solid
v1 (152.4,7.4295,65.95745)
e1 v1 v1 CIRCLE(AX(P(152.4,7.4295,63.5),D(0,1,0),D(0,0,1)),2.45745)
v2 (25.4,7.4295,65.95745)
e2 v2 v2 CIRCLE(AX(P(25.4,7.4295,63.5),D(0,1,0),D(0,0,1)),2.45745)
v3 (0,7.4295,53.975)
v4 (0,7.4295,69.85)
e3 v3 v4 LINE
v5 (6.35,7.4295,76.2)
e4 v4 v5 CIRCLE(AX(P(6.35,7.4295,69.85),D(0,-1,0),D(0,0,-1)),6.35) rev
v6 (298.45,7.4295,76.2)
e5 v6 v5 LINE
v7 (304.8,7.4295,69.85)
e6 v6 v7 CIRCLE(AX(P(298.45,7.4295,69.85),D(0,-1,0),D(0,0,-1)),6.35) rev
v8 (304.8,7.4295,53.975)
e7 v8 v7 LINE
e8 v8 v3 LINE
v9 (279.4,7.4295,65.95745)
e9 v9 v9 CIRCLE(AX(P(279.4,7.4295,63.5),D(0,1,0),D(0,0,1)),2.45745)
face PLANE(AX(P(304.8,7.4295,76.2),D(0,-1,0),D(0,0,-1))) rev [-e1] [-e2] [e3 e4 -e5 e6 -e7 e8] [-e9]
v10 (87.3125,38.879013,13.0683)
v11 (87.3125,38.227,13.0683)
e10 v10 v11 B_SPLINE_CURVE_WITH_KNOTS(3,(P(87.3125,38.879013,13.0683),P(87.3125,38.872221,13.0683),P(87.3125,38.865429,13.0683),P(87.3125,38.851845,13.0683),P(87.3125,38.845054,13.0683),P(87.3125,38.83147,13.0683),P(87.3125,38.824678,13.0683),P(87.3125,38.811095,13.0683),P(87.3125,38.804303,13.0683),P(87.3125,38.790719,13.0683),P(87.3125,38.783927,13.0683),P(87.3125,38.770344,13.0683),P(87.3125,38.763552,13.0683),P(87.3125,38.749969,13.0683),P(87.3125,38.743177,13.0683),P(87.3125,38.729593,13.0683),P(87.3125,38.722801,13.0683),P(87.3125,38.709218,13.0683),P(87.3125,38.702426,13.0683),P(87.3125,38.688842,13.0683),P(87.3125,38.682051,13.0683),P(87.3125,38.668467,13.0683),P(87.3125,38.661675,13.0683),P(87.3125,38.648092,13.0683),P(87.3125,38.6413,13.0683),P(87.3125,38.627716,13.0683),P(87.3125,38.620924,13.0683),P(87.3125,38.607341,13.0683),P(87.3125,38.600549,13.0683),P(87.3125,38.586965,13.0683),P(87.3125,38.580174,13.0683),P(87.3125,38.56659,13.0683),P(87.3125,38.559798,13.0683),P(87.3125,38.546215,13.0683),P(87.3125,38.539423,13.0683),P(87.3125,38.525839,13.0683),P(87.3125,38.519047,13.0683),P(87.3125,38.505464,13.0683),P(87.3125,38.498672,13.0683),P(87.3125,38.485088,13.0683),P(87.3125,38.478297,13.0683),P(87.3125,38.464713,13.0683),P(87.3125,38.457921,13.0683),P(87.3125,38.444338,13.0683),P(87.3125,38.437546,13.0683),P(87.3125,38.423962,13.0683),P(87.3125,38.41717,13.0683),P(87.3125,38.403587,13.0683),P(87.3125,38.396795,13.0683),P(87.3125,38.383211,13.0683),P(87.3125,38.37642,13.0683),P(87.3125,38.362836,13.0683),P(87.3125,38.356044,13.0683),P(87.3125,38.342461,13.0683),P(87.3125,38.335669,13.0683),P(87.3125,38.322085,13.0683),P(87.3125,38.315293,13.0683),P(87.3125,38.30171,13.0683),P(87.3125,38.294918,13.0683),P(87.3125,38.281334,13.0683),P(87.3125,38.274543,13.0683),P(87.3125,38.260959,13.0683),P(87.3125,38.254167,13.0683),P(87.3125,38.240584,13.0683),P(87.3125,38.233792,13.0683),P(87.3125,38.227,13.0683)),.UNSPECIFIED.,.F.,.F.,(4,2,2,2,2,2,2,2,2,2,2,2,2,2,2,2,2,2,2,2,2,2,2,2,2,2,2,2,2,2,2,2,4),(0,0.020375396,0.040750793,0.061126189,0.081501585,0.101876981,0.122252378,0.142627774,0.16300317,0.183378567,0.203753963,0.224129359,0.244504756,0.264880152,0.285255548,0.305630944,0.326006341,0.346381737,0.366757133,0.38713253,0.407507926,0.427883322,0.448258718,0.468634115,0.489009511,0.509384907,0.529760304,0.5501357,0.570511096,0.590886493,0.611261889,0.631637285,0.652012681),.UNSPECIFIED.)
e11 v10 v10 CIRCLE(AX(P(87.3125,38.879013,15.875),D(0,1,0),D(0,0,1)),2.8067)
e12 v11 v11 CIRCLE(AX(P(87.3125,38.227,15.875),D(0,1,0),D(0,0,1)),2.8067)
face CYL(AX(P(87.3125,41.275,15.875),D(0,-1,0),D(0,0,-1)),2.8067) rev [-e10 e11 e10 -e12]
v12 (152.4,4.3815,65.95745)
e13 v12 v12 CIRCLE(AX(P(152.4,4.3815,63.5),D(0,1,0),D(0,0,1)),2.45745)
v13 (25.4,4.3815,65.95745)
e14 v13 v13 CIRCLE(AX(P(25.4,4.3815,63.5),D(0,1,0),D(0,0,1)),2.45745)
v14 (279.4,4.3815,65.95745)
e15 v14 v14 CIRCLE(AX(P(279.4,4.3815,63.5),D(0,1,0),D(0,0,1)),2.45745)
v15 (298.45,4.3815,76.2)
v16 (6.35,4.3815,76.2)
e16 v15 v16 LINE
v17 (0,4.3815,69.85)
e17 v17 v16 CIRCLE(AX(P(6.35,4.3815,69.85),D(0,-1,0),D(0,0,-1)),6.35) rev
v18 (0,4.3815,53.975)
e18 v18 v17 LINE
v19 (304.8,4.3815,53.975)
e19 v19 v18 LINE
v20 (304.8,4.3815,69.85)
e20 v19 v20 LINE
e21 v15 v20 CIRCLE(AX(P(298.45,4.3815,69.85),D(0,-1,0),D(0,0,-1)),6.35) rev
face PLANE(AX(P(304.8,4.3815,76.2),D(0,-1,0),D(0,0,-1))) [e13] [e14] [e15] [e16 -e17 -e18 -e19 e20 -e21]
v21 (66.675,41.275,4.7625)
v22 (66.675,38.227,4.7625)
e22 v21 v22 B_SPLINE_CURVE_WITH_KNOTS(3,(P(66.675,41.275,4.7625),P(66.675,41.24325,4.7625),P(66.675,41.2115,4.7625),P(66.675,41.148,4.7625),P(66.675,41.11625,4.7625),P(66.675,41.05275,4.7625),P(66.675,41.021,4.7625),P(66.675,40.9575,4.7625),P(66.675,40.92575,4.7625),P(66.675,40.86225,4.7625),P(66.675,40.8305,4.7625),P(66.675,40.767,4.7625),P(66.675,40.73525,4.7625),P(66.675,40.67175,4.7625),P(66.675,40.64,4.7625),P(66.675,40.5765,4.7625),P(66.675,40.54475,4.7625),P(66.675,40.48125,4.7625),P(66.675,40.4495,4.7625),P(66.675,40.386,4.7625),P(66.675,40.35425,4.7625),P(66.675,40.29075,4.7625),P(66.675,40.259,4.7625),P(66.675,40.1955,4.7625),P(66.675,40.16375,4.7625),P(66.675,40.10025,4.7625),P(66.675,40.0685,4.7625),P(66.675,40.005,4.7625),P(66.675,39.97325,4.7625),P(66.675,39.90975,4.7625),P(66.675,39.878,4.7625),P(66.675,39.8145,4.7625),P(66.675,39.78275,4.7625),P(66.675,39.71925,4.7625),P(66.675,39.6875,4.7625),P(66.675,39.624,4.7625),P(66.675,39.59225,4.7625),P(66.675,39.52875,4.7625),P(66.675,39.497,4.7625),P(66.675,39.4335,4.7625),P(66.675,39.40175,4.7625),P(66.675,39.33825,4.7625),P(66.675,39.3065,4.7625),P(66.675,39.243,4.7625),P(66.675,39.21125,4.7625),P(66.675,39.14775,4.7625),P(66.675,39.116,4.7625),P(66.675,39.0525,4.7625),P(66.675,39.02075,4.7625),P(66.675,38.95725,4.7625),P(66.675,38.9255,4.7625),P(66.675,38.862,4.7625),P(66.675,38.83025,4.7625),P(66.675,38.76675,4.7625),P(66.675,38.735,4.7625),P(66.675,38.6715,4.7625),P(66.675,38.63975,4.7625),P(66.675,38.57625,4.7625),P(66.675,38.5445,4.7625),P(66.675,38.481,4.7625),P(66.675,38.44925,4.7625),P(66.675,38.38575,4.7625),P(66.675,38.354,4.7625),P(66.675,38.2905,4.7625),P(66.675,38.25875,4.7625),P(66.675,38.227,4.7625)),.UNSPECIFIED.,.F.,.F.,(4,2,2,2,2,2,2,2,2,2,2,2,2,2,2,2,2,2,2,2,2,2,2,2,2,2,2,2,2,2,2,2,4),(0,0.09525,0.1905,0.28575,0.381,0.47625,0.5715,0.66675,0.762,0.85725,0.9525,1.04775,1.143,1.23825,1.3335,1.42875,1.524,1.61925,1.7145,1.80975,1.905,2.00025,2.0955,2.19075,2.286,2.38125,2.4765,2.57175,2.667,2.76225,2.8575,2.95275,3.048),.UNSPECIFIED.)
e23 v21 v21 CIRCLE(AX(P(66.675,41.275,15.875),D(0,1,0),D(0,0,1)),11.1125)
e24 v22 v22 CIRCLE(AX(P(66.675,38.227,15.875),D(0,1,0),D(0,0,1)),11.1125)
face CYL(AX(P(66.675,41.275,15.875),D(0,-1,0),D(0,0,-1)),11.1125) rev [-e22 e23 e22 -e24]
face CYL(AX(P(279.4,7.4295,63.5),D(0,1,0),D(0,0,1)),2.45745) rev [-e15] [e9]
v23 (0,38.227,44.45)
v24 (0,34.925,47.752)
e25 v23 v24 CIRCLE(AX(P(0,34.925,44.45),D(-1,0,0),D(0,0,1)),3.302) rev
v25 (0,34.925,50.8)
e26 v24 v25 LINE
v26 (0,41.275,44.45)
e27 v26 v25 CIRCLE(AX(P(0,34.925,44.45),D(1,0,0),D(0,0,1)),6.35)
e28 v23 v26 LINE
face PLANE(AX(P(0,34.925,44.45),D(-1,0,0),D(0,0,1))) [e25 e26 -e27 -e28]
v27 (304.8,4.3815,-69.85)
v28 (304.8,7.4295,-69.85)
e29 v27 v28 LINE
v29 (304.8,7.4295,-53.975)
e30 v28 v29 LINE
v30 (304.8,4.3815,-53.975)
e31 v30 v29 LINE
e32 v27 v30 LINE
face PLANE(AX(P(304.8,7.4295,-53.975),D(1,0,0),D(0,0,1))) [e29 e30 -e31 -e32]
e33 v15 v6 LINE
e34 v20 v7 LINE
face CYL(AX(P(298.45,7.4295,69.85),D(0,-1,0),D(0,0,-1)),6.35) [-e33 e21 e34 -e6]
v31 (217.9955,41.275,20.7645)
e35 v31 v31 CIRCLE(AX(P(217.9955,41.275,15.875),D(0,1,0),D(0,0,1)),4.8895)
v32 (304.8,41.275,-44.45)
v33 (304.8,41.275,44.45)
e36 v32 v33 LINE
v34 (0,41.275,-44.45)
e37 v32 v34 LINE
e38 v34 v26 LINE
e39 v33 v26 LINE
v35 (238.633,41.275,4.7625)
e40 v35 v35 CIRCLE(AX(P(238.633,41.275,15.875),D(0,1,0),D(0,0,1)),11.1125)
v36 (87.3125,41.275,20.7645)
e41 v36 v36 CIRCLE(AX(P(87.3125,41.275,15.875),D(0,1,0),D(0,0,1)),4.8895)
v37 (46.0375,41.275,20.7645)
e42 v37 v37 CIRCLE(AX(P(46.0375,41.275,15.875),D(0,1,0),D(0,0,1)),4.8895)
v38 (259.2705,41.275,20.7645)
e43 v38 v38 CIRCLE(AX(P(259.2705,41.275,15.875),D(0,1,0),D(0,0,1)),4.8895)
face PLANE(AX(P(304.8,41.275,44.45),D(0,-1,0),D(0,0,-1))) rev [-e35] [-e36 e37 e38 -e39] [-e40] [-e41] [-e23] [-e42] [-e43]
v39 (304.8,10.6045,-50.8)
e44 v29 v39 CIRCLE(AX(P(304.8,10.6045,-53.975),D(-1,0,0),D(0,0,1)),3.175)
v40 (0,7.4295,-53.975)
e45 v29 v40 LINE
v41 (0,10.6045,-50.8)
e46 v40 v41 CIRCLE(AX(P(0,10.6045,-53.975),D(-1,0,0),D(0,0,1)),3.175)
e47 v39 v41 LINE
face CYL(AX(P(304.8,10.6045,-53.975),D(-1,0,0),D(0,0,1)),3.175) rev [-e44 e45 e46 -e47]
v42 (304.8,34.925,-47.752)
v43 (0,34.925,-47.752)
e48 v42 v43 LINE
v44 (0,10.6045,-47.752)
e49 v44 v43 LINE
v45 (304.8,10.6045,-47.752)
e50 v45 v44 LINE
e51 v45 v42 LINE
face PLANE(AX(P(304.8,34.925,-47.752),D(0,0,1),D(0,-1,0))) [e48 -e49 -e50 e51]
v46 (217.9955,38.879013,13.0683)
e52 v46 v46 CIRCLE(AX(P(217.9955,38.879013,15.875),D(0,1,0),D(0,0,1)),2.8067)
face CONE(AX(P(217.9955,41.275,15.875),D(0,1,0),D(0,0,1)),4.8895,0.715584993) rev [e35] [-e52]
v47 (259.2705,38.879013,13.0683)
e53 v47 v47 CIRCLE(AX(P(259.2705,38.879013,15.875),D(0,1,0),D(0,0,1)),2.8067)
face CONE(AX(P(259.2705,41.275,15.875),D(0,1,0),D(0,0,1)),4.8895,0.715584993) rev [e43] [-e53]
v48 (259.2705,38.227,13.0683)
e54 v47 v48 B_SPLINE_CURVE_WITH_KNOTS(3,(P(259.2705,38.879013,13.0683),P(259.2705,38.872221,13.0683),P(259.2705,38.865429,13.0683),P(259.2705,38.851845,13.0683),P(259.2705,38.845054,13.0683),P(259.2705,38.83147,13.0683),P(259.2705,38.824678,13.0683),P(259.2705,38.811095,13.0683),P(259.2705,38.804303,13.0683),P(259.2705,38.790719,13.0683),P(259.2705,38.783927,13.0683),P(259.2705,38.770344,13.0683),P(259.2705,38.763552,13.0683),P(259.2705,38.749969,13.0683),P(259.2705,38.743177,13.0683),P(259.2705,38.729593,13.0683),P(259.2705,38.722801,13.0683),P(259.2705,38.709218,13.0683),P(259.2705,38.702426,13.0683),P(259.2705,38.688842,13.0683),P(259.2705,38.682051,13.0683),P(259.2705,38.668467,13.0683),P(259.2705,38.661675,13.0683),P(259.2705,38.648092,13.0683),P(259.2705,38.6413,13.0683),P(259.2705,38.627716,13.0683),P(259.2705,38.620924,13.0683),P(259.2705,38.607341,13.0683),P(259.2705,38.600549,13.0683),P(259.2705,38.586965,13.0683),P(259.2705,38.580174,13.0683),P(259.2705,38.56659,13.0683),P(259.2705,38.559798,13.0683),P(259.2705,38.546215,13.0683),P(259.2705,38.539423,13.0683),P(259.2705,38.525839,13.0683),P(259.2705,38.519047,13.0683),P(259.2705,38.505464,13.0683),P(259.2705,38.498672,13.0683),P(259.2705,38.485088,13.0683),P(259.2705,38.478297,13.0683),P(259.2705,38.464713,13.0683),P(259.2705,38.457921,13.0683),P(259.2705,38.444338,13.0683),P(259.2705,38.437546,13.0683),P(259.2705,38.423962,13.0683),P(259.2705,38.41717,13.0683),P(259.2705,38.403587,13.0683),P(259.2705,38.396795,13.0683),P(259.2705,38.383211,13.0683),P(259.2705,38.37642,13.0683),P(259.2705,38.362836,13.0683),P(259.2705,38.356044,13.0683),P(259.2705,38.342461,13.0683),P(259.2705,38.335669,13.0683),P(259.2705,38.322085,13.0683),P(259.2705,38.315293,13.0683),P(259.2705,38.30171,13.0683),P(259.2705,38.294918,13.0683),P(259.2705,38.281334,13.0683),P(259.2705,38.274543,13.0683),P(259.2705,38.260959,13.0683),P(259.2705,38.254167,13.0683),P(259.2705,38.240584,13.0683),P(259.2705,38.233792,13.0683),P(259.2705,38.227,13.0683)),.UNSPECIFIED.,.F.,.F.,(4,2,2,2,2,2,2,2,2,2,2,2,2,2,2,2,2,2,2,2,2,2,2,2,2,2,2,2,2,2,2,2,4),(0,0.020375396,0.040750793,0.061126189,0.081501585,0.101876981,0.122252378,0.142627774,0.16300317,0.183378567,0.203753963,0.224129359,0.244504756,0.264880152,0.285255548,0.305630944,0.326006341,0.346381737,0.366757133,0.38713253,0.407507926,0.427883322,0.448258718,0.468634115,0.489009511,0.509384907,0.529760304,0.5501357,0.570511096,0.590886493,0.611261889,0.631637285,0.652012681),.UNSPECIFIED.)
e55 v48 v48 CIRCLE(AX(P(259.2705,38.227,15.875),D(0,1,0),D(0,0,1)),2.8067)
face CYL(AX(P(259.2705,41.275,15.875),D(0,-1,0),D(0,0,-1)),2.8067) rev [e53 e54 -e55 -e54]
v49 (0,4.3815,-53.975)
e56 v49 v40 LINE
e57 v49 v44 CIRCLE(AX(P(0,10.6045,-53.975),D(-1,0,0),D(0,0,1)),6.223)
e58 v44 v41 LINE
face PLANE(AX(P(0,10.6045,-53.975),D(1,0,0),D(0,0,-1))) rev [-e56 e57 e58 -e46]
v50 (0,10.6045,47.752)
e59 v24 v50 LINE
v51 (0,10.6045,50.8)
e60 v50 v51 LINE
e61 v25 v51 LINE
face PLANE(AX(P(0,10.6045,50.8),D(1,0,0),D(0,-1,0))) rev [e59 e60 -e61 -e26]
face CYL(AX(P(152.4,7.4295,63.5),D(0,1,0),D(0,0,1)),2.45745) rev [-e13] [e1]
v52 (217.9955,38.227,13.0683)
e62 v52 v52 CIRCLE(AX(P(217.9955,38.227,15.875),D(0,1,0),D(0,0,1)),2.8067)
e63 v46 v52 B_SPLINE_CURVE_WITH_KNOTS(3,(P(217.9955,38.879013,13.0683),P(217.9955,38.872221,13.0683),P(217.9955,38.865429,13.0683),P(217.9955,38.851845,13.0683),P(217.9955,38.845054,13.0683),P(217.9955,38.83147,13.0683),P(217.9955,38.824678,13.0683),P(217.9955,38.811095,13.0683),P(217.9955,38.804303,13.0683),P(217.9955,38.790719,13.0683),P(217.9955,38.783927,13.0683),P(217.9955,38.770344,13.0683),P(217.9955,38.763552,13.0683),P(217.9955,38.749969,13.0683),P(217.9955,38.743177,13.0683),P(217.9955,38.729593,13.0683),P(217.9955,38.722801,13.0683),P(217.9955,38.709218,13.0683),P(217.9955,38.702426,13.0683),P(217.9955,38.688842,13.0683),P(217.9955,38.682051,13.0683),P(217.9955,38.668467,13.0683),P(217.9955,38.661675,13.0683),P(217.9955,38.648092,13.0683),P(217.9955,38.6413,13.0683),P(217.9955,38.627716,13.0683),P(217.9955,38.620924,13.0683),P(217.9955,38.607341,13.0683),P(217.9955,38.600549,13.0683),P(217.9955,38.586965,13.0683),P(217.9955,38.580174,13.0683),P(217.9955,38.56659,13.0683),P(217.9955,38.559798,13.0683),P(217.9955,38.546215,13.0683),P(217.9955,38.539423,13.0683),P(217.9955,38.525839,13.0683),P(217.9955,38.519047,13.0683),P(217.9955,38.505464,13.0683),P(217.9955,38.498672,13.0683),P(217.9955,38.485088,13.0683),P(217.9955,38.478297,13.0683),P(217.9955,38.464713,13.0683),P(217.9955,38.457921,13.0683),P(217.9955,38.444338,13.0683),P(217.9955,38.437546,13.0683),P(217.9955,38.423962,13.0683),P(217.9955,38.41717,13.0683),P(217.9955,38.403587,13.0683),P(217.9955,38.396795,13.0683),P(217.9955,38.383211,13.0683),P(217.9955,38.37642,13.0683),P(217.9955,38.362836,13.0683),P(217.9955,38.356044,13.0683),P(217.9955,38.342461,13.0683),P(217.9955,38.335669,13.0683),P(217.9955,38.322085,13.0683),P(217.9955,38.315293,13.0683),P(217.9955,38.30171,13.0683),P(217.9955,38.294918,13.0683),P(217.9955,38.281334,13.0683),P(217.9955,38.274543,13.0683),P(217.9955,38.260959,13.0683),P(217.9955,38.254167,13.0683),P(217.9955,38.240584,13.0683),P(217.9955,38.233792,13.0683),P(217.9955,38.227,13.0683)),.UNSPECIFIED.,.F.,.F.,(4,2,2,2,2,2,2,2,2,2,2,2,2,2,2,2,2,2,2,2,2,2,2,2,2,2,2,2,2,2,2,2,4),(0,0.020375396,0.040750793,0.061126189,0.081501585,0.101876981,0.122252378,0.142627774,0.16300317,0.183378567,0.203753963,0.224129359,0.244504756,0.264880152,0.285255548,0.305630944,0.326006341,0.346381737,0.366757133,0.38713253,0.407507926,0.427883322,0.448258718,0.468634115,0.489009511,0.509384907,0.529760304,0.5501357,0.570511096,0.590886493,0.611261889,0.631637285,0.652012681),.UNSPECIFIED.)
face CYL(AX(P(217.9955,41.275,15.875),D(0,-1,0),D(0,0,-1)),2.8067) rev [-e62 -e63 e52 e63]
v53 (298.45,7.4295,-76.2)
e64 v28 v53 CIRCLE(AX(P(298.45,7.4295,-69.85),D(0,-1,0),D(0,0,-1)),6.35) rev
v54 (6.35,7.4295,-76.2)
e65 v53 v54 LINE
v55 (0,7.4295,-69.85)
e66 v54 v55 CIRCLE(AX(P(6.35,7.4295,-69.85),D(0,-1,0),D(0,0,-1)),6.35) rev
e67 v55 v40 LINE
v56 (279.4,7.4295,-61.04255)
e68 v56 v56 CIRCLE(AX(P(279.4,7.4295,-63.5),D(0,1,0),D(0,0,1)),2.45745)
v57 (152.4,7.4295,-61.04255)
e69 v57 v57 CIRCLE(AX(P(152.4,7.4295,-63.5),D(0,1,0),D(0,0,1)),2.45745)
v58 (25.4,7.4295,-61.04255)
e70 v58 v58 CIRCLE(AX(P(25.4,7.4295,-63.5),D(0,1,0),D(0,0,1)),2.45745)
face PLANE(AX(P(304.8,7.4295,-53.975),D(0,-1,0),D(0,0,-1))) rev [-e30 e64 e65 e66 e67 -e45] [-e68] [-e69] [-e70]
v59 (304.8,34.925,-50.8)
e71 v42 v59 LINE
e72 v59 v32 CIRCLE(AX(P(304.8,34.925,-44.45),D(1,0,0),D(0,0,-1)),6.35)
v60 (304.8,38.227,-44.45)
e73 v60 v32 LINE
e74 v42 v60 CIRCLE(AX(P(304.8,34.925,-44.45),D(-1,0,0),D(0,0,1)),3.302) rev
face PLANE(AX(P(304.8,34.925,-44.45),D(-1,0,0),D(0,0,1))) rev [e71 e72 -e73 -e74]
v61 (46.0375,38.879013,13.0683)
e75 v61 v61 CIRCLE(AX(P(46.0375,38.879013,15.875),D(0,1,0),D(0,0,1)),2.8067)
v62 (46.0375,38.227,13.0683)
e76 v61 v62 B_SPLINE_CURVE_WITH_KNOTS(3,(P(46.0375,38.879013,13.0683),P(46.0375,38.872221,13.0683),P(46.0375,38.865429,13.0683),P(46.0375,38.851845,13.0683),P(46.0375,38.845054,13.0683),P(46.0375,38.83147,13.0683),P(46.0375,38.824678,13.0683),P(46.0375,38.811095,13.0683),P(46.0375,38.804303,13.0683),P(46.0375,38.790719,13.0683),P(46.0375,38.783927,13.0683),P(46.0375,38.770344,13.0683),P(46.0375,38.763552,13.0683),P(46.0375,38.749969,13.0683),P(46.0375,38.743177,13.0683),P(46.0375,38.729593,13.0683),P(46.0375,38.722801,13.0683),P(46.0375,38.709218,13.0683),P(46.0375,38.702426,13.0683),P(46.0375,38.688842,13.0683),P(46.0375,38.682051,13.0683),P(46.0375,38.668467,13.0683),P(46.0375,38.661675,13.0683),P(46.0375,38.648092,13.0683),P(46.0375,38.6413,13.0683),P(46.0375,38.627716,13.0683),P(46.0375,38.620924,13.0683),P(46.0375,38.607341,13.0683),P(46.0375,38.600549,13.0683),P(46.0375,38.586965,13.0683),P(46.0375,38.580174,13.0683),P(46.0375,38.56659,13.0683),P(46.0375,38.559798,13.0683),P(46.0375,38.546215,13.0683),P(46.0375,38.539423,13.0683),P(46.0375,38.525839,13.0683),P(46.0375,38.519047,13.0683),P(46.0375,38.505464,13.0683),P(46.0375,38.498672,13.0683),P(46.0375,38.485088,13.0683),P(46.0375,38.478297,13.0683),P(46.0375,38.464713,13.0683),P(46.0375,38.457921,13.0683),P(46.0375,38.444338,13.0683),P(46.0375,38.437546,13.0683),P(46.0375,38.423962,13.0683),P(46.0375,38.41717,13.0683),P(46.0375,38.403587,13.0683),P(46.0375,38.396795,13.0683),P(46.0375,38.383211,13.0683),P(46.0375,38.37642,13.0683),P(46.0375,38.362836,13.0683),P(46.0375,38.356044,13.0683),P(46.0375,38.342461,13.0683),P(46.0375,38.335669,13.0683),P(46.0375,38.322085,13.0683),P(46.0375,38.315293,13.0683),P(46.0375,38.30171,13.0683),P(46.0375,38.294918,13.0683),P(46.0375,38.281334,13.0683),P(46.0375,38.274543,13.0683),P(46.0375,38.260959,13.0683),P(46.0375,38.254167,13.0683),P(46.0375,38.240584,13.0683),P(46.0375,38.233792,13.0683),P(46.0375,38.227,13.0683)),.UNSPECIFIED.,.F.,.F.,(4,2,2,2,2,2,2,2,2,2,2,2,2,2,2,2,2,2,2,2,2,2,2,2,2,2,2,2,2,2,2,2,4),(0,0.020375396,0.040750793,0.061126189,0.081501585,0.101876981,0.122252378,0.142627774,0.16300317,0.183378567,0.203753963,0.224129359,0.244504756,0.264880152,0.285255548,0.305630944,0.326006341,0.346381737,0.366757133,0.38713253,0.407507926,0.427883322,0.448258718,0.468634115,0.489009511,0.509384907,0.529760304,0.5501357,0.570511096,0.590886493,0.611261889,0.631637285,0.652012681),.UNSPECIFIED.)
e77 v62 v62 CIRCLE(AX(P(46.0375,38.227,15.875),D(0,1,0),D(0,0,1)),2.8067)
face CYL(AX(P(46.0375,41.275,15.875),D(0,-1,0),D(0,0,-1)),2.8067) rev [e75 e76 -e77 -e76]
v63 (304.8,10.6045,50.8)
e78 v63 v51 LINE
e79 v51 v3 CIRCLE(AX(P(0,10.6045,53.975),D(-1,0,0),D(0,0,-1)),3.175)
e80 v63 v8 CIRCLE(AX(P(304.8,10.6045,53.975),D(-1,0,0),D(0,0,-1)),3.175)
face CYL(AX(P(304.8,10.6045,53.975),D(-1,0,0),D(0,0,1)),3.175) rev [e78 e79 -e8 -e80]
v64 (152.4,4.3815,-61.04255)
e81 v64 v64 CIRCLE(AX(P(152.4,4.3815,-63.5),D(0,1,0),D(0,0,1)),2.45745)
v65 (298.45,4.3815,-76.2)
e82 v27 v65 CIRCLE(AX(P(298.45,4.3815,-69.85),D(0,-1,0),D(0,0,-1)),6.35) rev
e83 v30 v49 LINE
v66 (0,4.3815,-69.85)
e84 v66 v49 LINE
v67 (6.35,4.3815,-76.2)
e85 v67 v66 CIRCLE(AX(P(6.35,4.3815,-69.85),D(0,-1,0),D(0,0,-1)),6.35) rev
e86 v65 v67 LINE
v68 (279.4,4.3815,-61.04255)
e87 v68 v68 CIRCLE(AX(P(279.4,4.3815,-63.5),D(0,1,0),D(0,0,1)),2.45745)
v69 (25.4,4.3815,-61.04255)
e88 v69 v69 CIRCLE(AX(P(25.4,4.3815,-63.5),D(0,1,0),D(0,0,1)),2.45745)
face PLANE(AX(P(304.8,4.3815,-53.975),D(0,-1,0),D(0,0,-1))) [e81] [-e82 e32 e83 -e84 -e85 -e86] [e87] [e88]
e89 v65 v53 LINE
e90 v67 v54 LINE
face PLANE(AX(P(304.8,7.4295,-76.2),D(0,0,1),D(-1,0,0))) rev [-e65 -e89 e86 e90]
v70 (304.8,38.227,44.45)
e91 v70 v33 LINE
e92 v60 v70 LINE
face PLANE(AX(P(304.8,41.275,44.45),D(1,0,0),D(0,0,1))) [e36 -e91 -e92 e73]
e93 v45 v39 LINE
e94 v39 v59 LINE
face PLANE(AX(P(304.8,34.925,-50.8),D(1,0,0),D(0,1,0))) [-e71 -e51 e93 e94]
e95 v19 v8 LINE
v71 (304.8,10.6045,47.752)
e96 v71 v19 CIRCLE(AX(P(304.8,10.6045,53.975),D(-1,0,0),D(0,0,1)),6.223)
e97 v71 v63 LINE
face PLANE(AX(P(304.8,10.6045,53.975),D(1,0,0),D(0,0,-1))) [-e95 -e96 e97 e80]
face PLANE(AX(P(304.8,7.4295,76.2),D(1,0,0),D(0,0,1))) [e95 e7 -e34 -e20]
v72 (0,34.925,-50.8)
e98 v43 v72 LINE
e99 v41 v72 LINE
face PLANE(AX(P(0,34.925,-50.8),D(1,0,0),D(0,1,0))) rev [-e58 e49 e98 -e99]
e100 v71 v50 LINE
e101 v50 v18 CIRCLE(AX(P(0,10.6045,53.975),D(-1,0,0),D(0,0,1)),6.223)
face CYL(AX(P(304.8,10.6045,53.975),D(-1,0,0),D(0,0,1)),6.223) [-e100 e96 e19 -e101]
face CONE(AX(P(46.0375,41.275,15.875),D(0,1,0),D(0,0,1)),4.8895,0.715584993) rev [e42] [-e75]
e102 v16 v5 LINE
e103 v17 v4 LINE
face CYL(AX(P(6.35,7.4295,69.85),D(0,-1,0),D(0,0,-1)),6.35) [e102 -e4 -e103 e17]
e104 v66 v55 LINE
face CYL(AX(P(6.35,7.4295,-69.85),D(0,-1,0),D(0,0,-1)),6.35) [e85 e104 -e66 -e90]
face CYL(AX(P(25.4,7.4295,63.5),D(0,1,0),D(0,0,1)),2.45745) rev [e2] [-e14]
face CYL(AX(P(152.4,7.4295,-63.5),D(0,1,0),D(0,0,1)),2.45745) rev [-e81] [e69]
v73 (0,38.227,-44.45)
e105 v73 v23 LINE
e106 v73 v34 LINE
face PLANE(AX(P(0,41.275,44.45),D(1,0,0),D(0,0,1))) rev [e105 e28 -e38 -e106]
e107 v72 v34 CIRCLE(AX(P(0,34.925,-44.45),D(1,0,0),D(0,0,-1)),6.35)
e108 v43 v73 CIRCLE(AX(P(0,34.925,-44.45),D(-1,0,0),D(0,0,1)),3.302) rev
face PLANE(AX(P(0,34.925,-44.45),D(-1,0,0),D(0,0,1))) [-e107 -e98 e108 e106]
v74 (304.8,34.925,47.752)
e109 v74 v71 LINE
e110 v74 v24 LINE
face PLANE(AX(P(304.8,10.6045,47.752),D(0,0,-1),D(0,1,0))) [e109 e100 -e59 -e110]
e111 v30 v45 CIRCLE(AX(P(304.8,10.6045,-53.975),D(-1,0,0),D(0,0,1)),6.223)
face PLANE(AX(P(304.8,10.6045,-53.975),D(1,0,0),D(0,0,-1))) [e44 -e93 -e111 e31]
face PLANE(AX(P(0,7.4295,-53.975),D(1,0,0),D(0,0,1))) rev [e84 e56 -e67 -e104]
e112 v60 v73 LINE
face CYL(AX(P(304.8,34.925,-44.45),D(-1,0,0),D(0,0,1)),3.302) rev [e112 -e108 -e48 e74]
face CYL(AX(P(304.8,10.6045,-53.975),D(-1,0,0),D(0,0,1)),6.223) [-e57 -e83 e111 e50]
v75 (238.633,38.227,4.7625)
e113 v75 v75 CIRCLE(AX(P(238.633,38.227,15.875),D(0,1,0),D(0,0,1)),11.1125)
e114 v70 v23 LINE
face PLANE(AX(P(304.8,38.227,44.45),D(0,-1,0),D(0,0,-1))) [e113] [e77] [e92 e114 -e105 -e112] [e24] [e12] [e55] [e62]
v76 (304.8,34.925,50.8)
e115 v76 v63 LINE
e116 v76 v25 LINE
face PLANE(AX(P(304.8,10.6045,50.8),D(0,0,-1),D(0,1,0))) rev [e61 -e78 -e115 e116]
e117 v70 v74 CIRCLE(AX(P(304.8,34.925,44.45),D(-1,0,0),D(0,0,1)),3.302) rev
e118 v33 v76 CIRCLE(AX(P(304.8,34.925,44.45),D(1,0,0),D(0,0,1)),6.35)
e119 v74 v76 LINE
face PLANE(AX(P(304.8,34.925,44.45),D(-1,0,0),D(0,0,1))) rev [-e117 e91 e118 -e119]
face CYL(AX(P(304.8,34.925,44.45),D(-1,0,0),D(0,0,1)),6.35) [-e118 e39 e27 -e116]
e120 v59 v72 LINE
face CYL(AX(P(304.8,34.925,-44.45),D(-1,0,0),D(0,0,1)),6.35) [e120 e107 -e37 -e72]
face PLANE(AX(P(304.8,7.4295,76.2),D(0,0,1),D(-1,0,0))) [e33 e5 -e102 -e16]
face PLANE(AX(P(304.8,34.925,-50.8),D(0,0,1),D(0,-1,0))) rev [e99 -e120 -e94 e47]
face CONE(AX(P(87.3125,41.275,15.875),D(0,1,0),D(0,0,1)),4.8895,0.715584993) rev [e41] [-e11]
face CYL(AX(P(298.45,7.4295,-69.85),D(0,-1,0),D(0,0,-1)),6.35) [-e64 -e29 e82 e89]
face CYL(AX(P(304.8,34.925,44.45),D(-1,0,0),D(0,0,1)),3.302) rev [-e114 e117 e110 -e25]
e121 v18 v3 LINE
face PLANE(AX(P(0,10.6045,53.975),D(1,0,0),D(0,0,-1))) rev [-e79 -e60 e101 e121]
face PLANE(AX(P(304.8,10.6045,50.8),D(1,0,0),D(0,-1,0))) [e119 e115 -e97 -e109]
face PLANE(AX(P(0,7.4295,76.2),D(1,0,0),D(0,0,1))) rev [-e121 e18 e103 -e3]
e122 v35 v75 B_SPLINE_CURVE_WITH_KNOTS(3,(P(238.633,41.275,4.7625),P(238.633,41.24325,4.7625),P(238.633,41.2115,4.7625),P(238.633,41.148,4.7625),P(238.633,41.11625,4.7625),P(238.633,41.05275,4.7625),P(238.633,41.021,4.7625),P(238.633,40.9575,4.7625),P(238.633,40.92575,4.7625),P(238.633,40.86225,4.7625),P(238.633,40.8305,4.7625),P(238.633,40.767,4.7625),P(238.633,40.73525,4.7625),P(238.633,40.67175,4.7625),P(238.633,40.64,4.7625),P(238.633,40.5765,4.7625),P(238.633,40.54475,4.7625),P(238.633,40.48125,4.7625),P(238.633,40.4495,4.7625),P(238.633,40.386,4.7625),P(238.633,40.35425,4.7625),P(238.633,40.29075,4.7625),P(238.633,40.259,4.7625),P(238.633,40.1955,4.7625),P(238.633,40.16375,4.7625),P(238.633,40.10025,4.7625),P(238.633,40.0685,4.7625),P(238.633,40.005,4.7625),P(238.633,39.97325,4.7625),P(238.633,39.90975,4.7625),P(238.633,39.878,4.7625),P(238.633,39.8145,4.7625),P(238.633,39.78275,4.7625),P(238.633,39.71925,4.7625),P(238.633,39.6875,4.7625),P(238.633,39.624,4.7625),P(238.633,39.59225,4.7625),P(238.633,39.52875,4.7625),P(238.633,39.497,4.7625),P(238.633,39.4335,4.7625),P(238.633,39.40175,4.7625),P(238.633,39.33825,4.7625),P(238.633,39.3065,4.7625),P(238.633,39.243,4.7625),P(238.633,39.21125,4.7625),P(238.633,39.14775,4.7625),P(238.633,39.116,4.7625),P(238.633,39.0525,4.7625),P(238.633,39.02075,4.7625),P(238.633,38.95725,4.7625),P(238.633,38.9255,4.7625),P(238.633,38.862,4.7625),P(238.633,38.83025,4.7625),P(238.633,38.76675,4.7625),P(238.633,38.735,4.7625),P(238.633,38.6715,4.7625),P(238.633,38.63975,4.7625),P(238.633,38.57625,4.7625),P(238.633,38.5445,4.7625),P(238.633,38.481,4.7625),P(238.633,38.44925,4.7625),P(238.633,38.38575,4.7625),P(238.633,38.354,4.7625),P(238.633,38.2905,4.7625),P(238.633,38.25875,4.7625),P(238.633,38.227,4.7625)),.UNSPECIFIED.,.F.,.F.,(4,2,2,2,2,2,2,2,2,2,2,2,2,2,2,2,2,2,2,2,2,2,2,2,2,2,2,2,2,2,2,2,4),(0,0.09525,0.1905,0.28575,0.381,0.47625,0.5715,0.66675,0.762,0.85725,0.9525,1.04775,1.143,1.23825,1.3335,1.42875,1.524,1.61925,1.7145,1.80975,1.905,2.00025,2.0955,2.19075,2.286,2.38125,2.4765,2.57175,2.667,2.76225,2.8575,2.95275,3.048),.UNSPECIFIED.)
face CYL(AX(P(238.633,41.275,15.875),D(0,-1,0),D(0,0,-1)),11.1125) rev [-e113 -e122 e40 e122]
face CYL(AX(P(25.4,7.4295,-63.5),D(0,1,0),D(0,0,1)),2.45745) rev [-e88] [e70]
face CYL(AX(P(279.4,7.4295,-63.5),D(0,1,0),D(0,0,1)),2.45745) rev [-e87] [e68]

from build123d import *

# Parameters (mm, degrees)
BOSS_EXTRUDE1_DEPTH                                = 304.8
SKETCH2_R                                          = 2.3876
CUT_EXTRUDE1_DEPTH                                 = 317.354227758
SKETCH3_R                                          = 11.1125
CUT_EXTRUDE2_DEPTH                                 = 304.8
CSK_FOR_10_FLAT_HEAD_MACHINE_SCREW1_AT_COUNT       = 2
CSK_FOR_10_FLAT_HEAD_MACHINE_SCREW1_AT_PITCH       = 41.275
LPATTERN1_COUNT                                    = 2
LPATTERN1_PITCH                                    = 171.958
FILLET1_R                                          = 6.35
SKETCH14_R                                         = 4.8895
SKETCH14_R_2                                       = 2.8067
BOSS_EXTRUDE2_DEPTH                                = 3.175
CONVERT_SOLID1_DEPTH                               = 304.8
F_10_0_1935_DIAMETER_HOLE1_D                       = 4.9149
F_10_0_1935_DIAMETER_HOLE1_DEPTH                   = 3.048
CSK_FOR_10_FLAT_HEAD_MACHINE_SCREW_100_D           = 5.6134
CSK_FOR_10_FLAT_HEAD_MACHINE_SCREW_100_DEPTH       = 36.8935
CSK_FOR_10_FLAT_HEAD_MACHINE_SCREW_100_CSINK_D     = 9.779
CSK_FOR_10_FLAT_HEAD_MACHINE_SCREW_100_CSINK_ANGLE = 82


# Read off the part's stored shape, not the designer's step: Convert-Solid1
with BuildPart() as part:
    # Sketch1 → Boss-Extrude1 (new body)
    with BuildSketch(Plane(origin=(0, 0, 0), x_dir=(0, 0, -1), z_dir=(1, 0, 0))):
        with BuildLine():
            Line((-76.2, 4.2545), (-53.975, 4.2545))
            ThreePointArc((-53.975, 4.2545), (-49.484871939, 6.114371939), (-47.625, 10.6045))
            Line((-47.625, 10.6045), (-47.625, 34.925))
            ThreePointArc((-47.625, 34.925), (-46.69506403, 37.17006403), (-44.45, 38.1))
            Line((-44.45, 38.1), (44.45, 38.1))
            ThreePointArc((44.45, 38.1), (46.69506403, 37.17006403), (47.625, 34.925))
            Line((47.625, 34.925), (47.625, 10.6045))
            ThreePointArc((47.625, 10.6045), (49.484871939, 6.114371939), (53.975, 4.2545))
            Line((53.975, 4.2545), (76.2, 4.2545))
            Line((76.2, 4.2545), (76.2, 7.4295))
            Line((76.2, 7.4295), (53.975, 7.4295))
            ThreePointArc((53.975, 7.4295), (51.72993597, 8.35943597), (50.8, 10.6045))
            Line((50.8, 10.6045), (50.8, 34.925))
            ThreePointArc((50.8, 34.925), (48.940128061, 39.415128061), (44.45, 41.275))
            Line((44.45, 41.275), (-44.45, 41.275))
            ThreePointArc((-44.45, 41.275), (-48.940128061, 39.415128061), (-50.8, 34.925))
            Line((-50.8, 34.925), (-50.8, 10.6045))
            ThreePointArc((-50.8, 10.6045), (-51.72993597, 8.35943597), (-53.975, 7.4295))
            Line((-53.975, 7.4295), (-76.2, 7.4295))
            Line((-76.2, 7.4295), (-76.2, 4.2545))
        make_face()
    extrude(amount=BOSS_EXTRUDE1_DEPTH)

    # Sketch2 → Cut-Extrude1 (cut, through all)
    with BuildSketch(Plane.XZ.offset(-4.2545)):
        with Locations(Location((25.4, 63.5, 0), (0, 0, 270))):
            Circle(SKETCH2_R)
        with Locations(Location((152.4, 63.5, 0), (0, 0, 270))):
            Circle(SKETCH2_R)
        with Locations(Location((279.4, 63.5, 0), (0, 0, 270))):
            Circle(SKETCH2_R)
    cut_extrude1 = extrude(amount=-CUT_EXTRUDE1_DEPTH, mode=Mode.SUBTRACT)

    # Mirror1: Cut-Extrude1 across plane
    add(cut_extrude1.mirror(Plane.XY), mode=Mode.SUBTRACT)

    # Sketch3 → Cut-Extrude2 (cut)
    with BuildSketch(Plane(origin=(0, 41.275, 0), x_dir=(1, 0, 0), z_dir=(0, 1, 0))):
        with Locations(Location((66.675, -15.875, 0), (0, 0, 270))):
            Circle(SKETCH3_R)
    cut_extrude2 = extrude(amount=-CUT_EXTRUDE2_DEPTH, mode=Mode.SUBTRACT)

    # Sketch5 → CSK for #10 Flat Head Machine Screw1 (revolve, cut)
    with BuildSketch(Plane(origin=(46.0375, 41.275, 15.875), x_dir=(0, 0, 1), z_dir=(1, 0, 0))):
        Polygon((0, 0), (0, 3.175), (2.8067, 3.175), (2.8067, 2.395987319), (4.8895, 0), align=None)
    csk_for_10_flat_head_machine_screw1 = revolve(axis=Axis((46.0375, 47.625, 15.875), (0, -1, 0)), mode=Mode.SUBTRACT)

    # CSK for #10 Flat Head Machine Screw1 at: CSK for #10 Flat Head Machine Screw1 ×2
    with Locations(*[(i * CSK_FOR_10_FLAT_HEAD_MACHINE_SCREW1_AT_PITCH, 0, 0) for i in range(1, CSK_FOR_10_FLAT_HEAD_MACHINE_SCREW1_AT_COUNT)]):
        add(csk_for_10_flat_head_machine_screw1, mode=Mode.SUBTRACT)

    # LPattern1: Cut-Extrude2, CSK for #10 Flat Head Machine Screw1 ×2
    with Locations(*[(i * LPATTERN1_PITCH, 0, 0) for i in range(1, LPATTERN1_COUNT)]):
        add(cut_extrude2, mode=Mode.SUBTRACT)
        add(csk_for_10_flat_head_machine_screw1, mode=Mode.SUBTRACT)

    # LPattern1 copy 1 sketch → LPattern1 copy 1 (revolve, cut)
    with BuildSketch(Plane(origin=(259.2705, 41.275, 15.875), x_dir=(0, 0, 1), z_dir=(1, 0, 0))):
        Polygon((0, 0), (0, 3.175), (2.8067, 3.175), (2.8067, 2.395987319), (4.8895, 0), align=None)
    revolve(axis=Axis((259.2705, 47.625, 15.875), (0, -1, 0)), mode=Mode.SUBTRACT)

    # Fillet1
    fillet1_edges = [part.edges().sort_by_distance(p)[0] for p in [
        (0, 5.842, -76.2),
        (0, 5.842, 76.2),
        (304.8, 5.842, -76.2),
        (304.8, 5.842, 76.2),
    ]]
    fillet(fillet1_edges, radius=FILLET1_R)

    # Sketch14 → Boss-Extrude2 (add)
    # profile 1 of 4: a face of its own
    with BuildSketch(Plane(origin=(0, 41.275, 0), x_dir=(1, 0, 0), z_dir=(0, 1, 0))):
        with Locations((259.2705, -15.875)):
            Circle(SKETCH14_R)
        with Locations(Location((259.2705, -15.875, 0), (0, 0, 270))):
            Circle(SKETCH14_R_2, mode=Mode.SUBTRACT)
    # profile 2 of 4: a face of its own
    with BuildSketch(Plane(origin=(0, 41.275, 0), x_dir=(1, 0, 0), z_dir=(0, 1, 0))):
        with Locations((87.3125, -15.875)):
            Circle(SKETCH14_R)
        with Locations(Location((87.3125, -15.875, 0), (0, 0, 270))):
            Circle(SKETCH14_R_2, mode=Mode.SUBTRACT)
    # profile 3 of 4: a face of its own
    with BuildSketch(Plane(origin=(0, 41.275, 0), x_dir=(1, 0, 0), z_dir=(0, 1, 0))):
        with Locations((217.9955, -15.875)):
            Circle(SKETCH14_R)
        with Locations(Location((217.9955, -15.875, 0), (0, 0, 270))):
            Circle(SKETCH14_R_2, mode=Mode.SUBTRACT)
    # profile 4 of 4: a face of its own
    with BuildSketch(Plane(origin=(0, 41.275, 0), x_dir=(1, 0, 0), z_dir=(0, 1, 0))):
        with Locations((46.0375, -15.875)):
            Circle(SKETCH14_R)
        with Locations(Location((46.0375, -15.875, 0), (0, 0, 270))):
            Circle(SKETCH14_R_2, mode=Mode.SUBTRACT)
    extrude(amount=-BOSS_EXTRUDE2_DEPTH)

    # Convert-Solid1 outline → Convert-Solid1 (cut)
    with BuildSketch(Plane.YZ):
        with BuildLine():
            Line((4.3815, -76.2), (4.3815, -53.975))
            ThreePointArc((4.3815, -53.975), (6.204174501, -49.574674501), (10.6045, -47.752))
            Line((10.6045, -47.752), (34.925, -47.752))
            ThreePointArc((34.925, -47.752), (37.259866591, -46.784866591), (38.227, -44.45))
            Line((38.227, -44.45), (38.227, 44.45))
            ThreePointArc((38.227, 44.45), (37.259866591, 46.784866591), (34.925, 47.752))
            Line((34.925, 47.752), (10.6045, 47.752))
            ThreePointArc((10.6045, 47.752), (6.204174501, 49.574674501), (4.3815, 53.975))
            Line((4.3815, 53.975), (4.3815, 76.2))
            Line((4.3815, 76.2), (4.2545, 76.2))
            Line((4.2545, 76.2), (4.2545, 53.975))
            ThreePointArc((4.2545, 53.975), (6.114371939, 49.484871939), (10.6045, 47.625))
            Line((10.6045, 47.625), (34.925, 47.625))
            ThreePointArc((34.925, 47.625), (37.17006403, 46.69506403), (38.1, 44.45))
            Line((38.1, 44.45), (38.1, -44.45))
            ThreePointArc((38.1, -44.45), (37.17006403, -46.69506403), (34.925, -47.625))
            Line((34.925, -47.625), (10.6045, -47.625))
            ThreePointArc((10.6045, -47.625), (6.114371939, -49.484871939), (4.2545, -53.975))
            Line((4.2545, -53.975), (4.2545, -76.2))
            Line((4.2545, -76.2), (4.3815, -76.2))
        make_face()
    extrude(amount=CONVERT_SOLID1_DEPTH, mode=Mode.SUBTRACT)

    # #10 (0.1935) Diameter Hole1
    with Locations(Plane(origin=(0, 7.4295, 0), x_dir=(1, 0, 0), z_dir=(0, 1, 0))):
        with Locations((25.4, 63.5), (152.4, 63.5), (279.4, 63.5), (279.4, -63.5), (152.4, -63.5), (25.4, -63.5)):
            Hole(F_10_0_1935_DIAMETER_HOLE1_D / 2, depth=F_10_0_1935_DIAMETER_HOLE1_DEPTH)

    # CSK for #10 Flat Head Machine Screw (100)1
    with Locations(Plane(origin=(0, 41.275, 0), x_dir=(1, 0, 0), z_dir=(0, 1, 0))):
        with Locations((46.0375, -15.875), (87.3125, -15.875), (217.9955, -15.875), (259.2705, -15.875)):
            CounterSinkHole(CSK_FOR_10_FLAT_HEAD_MACHINE_SCREW_100_D / 2, CSK_FOR_10_FLAT_HEAD_MACHINE_SCREW_100_CSINK_D / 2, depth=CSK_FOR_10_FLAT_HEAD_MACHINE_SCREW_100_DEPTH, counter_sink_angle=CSK_FOR_10_FLAT_HEAD_MACHINE_SCREW_100_CSINK_ANGLE)


solid = part.part
